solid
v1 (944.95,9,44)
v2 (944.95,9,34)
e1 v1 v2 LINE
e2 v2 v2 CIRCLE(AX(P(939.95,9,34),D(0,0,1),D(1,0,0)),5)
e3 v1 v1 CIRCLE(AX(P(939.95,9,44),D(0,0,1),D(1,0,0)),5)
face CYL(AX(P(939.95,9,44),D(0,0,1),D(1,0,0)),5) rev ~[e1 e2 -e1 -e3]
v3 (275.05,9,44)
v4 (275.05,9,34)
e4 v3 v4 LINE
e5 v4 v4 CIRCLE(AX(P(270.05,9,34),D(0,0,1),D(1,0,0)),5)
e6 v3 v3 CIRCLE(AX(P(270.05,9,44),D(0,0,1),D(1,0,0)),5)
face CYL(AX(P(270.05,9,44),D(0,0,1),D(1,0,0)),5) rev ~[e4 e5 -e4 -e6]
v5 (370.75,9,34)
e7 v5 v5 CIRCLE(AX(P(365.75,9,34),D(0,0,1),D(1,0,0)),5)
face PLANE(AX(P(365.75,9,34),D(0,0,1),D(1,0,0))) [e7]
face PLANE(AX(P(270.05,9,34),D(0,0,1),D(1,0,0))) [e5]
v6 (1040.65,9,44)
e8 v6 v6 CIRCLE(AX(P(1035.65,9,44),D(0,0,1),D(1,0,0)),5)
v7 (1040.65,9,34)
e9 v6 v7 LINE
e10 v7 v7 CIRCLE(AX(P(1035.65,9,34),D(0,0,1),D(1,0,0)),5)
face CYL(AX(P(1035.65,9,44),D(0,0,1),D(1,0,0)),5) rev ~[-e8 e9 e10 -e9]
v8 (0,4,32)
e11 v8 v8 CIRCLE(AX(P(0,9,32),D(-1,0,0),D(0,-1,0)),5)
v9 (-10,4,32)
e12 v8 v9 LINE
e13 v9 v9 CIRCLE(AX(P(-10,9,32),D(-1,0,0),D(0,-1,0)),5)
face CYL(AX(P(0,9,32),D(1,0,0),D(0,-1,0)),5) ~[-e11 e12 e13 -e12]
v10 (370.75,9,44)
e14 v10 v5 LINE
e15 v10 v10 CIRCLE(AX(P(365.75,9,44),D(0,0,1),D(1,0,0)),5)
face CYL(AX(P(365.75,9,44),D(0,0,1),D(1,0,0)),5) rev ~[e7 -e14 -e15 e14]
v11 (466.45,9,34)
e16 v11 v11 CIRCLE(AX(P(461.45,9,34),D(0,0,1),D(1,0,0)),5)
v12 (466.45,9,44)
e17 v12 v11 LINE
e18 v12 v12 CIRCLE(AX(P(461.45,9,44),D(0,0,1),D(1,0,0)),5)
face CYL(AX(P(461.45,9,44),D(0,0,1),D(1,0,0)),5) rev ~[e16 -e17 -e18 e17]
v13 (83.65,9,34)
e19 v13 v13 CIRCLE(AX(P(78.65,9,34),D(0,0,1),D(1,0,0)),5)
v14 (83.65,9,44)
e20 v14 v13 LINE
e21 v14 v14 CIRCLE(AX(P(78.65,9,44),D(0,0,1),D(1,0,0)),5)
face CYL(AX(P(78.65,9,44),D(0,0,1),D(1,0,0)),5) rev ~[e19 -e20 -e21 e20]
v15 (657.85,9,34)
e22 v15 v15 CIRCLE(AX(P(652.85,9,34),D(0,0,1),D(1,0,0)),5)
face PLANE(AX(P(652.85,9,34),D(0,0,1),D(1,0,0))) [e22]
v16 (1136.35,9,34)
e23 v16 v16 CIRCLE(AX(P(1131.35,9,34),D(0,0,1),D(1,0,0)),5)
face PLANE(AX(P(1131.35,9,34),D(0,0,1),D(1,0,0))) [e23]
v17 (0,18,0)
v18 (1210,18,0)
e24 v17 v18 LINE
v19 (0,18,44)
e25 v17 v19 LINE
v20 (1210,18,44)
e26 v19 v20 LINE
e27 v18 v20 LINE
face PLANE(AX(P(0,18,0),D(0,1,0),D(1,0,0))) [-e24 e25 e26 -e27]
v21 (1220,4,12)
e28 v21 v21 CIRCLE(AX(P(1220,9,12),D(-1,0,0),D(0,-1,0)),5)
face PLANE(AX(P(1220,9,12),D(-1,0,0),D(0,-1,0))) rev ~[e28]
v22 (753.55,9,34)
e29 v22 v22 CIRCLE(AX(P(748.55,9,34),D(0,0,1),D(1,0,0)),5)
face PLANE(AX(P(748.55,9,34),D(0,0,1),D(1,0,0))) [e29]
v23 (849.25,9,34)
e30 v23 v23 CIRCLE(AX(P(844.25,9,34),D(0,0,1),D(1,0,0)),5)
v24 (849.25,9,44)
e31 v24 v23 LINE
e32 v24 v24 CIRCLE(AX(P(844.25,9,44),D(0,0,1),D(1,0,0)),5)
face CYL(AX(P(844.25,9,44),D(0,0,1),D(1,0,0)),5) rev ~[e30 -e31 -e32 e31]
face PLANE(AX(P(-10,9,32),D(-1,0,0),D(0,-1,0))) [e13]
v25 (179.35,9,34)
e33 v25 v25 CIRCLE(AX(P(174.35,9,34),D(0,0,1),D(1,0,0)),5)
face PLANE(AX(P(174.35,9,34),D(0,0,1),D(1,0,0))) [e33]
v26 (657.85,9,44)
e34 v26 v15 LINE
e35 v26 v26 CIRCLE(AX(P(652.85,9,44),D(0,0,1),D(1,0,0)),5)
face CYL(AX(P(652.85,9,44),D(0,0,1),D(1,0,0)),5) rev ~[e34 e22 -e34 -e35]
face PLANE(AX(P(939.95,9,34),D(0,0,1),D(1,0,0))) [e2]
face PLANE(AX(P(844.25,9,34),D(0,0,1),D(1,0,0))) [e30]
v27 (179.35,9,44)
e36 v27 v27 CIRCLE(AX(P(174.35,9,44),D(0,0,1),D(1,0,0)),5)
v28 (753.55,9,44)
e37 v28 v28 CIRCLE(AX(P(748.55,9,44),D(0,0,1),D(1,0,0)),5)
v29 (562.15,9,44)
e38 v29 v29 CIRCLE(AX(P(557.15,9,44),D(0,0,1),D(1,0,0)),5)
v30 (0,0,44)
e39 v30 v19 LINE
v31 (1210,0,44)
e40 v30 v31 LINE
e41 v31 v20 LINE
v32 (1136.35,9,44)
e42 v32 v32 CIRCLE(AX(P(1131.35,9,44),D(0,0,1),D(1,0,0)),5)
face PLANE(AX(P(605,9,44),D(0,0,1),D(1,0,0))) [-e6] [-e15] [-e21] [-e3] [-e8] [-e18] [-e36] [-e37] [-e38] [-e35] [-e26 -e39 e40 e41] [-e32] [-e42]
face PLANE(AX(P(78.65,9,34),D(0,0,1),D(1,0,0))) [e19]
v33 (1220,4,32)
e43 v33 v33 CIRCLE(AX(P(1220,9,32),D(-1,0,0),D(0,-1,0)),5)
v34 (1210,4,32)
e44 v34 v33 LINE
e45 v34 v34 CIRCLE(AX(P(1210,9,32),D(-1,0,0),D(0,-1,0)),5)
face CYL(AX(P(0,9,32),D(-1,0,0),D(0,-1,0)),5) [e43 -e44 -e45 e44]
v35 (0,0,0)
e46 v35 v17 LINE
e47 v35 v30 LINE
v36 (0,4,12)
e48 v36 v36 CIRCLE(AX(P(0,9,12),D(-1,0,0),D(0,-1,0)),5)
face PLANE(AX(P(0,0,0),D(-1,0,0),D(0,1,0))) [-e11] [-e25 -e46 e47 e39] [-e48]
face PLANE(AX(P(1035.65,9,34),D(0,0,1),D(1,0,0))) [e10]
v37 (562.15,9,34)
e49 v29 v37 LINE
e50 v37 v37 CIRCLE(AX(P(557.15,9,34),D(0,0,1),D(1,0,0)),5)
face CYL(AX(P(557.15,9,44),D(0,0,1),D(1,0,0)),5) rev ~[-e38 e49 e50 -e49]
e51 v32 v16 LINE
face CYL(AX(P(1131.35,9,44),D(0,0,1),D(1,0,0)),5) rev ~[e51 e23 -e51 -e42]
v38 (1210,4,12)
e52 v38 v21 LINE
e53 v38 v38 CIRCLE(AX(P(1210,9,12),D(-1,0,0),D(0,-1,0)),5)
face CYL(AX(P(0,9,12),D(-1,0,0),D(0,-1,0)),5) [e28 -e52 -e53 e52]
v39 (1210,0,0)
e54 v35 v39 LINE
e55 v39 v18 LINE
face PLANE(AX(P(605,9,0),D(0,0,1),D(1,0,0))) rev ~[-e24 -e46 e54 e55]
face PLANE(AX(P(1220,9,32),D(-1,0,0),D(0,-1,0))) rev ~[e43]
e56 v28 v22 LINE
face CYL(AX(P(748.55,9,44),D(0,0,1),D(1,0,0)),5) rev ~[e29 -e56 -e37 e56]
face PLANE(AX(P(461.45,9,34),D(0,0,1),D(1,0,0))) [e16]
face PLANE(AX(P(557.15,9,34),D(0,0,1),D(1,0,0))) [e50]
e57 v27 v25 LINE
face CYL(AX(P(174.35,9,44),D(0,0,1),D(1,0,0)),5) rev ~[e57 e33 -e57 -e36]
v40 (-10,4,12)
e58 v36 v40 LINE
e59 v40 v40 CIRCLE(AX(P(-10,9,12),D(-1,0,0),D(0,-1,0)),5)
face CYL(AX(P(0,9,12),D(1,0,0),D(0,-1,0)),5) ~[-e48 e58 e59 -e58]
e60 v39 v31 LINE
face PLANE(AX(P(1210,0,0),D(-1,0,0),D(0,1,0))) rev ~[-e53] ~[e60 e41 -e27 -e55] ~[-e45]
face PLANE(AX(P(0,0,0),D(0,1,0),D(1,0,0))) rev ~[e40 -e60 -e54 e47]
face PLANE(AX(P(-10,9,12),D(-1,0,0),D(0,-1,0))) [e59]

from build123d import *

# Parameters (mm, degrees)
F0_W          = 1210
F0_H          = 18
F1_DEPTH      = 44
F2_R          = 5
F3_DEPTH      = 10
F3_DEPTH_BACK = 1220
F4_R          = 5
F5_DEPTH      = 10


# Not quite as in the source:
# - a feature names something its author has since deleted; it is built from what else it names


with BuildPart() as f1:
    # F0 (on Top) → F1 (new body)
    with BuildSketch(Plane.XY):
        with Locations((605, 9)):
            Rectangle(F0_W, F0_H)
    extrude(amount=F1_DEPTH)

    # F2 (on face) → F3 (join, two sides)
    with BuildSketch(Plane(origin=(0, 0, 0), x_dir=(0, -1, 0), z_dir=(-1, 0, 0))) as f3_sk:
        with Locations((-9, 32)):
            Circle(F2_R)
        with Locations((-9, 12)):
            Circle(F2_R)
    extrude(amount=F3_DEPTH)
    extrude(f3_sk.sketch, amount=-F3_DEPTH_BACK)

    # F4 (on face) → F5 (cut)
    with BuildSketch(Plane.XY.offset(44)):
        with Locations((78.65, 9)):
            Circle(F4_R)
        with Locations((174.35, 9)):
            Circle(F4_R)
        with Locations((270.05, 9)):
            Circle(F4_R)
        with Locations((365.75, 9)):
            Circle(F4_R)
        with Locations((461.45, 9)):
            Circle(F4_R)
        with Locations((557.15, 9)):
            Circle(F4_R)
        with Locations((652.85, 9)):
            Circle(F4_R)
        with Locations((748.55, 9)):
            Circle(F4_R)
        with Locations((844.25, 9)):
            Circle(F4_R)
        with Locations((939.95, 9)):
            Circle(F4_R)
        with Locations((1035.65, 9)):
            Circle(F4_R)
        with Locations((1131.35, 9)):
            Circle(F4_R)
    extrude(amount=-F5_DEPTH, mode=Mode.SUBTRACT)


solid = f1.part
